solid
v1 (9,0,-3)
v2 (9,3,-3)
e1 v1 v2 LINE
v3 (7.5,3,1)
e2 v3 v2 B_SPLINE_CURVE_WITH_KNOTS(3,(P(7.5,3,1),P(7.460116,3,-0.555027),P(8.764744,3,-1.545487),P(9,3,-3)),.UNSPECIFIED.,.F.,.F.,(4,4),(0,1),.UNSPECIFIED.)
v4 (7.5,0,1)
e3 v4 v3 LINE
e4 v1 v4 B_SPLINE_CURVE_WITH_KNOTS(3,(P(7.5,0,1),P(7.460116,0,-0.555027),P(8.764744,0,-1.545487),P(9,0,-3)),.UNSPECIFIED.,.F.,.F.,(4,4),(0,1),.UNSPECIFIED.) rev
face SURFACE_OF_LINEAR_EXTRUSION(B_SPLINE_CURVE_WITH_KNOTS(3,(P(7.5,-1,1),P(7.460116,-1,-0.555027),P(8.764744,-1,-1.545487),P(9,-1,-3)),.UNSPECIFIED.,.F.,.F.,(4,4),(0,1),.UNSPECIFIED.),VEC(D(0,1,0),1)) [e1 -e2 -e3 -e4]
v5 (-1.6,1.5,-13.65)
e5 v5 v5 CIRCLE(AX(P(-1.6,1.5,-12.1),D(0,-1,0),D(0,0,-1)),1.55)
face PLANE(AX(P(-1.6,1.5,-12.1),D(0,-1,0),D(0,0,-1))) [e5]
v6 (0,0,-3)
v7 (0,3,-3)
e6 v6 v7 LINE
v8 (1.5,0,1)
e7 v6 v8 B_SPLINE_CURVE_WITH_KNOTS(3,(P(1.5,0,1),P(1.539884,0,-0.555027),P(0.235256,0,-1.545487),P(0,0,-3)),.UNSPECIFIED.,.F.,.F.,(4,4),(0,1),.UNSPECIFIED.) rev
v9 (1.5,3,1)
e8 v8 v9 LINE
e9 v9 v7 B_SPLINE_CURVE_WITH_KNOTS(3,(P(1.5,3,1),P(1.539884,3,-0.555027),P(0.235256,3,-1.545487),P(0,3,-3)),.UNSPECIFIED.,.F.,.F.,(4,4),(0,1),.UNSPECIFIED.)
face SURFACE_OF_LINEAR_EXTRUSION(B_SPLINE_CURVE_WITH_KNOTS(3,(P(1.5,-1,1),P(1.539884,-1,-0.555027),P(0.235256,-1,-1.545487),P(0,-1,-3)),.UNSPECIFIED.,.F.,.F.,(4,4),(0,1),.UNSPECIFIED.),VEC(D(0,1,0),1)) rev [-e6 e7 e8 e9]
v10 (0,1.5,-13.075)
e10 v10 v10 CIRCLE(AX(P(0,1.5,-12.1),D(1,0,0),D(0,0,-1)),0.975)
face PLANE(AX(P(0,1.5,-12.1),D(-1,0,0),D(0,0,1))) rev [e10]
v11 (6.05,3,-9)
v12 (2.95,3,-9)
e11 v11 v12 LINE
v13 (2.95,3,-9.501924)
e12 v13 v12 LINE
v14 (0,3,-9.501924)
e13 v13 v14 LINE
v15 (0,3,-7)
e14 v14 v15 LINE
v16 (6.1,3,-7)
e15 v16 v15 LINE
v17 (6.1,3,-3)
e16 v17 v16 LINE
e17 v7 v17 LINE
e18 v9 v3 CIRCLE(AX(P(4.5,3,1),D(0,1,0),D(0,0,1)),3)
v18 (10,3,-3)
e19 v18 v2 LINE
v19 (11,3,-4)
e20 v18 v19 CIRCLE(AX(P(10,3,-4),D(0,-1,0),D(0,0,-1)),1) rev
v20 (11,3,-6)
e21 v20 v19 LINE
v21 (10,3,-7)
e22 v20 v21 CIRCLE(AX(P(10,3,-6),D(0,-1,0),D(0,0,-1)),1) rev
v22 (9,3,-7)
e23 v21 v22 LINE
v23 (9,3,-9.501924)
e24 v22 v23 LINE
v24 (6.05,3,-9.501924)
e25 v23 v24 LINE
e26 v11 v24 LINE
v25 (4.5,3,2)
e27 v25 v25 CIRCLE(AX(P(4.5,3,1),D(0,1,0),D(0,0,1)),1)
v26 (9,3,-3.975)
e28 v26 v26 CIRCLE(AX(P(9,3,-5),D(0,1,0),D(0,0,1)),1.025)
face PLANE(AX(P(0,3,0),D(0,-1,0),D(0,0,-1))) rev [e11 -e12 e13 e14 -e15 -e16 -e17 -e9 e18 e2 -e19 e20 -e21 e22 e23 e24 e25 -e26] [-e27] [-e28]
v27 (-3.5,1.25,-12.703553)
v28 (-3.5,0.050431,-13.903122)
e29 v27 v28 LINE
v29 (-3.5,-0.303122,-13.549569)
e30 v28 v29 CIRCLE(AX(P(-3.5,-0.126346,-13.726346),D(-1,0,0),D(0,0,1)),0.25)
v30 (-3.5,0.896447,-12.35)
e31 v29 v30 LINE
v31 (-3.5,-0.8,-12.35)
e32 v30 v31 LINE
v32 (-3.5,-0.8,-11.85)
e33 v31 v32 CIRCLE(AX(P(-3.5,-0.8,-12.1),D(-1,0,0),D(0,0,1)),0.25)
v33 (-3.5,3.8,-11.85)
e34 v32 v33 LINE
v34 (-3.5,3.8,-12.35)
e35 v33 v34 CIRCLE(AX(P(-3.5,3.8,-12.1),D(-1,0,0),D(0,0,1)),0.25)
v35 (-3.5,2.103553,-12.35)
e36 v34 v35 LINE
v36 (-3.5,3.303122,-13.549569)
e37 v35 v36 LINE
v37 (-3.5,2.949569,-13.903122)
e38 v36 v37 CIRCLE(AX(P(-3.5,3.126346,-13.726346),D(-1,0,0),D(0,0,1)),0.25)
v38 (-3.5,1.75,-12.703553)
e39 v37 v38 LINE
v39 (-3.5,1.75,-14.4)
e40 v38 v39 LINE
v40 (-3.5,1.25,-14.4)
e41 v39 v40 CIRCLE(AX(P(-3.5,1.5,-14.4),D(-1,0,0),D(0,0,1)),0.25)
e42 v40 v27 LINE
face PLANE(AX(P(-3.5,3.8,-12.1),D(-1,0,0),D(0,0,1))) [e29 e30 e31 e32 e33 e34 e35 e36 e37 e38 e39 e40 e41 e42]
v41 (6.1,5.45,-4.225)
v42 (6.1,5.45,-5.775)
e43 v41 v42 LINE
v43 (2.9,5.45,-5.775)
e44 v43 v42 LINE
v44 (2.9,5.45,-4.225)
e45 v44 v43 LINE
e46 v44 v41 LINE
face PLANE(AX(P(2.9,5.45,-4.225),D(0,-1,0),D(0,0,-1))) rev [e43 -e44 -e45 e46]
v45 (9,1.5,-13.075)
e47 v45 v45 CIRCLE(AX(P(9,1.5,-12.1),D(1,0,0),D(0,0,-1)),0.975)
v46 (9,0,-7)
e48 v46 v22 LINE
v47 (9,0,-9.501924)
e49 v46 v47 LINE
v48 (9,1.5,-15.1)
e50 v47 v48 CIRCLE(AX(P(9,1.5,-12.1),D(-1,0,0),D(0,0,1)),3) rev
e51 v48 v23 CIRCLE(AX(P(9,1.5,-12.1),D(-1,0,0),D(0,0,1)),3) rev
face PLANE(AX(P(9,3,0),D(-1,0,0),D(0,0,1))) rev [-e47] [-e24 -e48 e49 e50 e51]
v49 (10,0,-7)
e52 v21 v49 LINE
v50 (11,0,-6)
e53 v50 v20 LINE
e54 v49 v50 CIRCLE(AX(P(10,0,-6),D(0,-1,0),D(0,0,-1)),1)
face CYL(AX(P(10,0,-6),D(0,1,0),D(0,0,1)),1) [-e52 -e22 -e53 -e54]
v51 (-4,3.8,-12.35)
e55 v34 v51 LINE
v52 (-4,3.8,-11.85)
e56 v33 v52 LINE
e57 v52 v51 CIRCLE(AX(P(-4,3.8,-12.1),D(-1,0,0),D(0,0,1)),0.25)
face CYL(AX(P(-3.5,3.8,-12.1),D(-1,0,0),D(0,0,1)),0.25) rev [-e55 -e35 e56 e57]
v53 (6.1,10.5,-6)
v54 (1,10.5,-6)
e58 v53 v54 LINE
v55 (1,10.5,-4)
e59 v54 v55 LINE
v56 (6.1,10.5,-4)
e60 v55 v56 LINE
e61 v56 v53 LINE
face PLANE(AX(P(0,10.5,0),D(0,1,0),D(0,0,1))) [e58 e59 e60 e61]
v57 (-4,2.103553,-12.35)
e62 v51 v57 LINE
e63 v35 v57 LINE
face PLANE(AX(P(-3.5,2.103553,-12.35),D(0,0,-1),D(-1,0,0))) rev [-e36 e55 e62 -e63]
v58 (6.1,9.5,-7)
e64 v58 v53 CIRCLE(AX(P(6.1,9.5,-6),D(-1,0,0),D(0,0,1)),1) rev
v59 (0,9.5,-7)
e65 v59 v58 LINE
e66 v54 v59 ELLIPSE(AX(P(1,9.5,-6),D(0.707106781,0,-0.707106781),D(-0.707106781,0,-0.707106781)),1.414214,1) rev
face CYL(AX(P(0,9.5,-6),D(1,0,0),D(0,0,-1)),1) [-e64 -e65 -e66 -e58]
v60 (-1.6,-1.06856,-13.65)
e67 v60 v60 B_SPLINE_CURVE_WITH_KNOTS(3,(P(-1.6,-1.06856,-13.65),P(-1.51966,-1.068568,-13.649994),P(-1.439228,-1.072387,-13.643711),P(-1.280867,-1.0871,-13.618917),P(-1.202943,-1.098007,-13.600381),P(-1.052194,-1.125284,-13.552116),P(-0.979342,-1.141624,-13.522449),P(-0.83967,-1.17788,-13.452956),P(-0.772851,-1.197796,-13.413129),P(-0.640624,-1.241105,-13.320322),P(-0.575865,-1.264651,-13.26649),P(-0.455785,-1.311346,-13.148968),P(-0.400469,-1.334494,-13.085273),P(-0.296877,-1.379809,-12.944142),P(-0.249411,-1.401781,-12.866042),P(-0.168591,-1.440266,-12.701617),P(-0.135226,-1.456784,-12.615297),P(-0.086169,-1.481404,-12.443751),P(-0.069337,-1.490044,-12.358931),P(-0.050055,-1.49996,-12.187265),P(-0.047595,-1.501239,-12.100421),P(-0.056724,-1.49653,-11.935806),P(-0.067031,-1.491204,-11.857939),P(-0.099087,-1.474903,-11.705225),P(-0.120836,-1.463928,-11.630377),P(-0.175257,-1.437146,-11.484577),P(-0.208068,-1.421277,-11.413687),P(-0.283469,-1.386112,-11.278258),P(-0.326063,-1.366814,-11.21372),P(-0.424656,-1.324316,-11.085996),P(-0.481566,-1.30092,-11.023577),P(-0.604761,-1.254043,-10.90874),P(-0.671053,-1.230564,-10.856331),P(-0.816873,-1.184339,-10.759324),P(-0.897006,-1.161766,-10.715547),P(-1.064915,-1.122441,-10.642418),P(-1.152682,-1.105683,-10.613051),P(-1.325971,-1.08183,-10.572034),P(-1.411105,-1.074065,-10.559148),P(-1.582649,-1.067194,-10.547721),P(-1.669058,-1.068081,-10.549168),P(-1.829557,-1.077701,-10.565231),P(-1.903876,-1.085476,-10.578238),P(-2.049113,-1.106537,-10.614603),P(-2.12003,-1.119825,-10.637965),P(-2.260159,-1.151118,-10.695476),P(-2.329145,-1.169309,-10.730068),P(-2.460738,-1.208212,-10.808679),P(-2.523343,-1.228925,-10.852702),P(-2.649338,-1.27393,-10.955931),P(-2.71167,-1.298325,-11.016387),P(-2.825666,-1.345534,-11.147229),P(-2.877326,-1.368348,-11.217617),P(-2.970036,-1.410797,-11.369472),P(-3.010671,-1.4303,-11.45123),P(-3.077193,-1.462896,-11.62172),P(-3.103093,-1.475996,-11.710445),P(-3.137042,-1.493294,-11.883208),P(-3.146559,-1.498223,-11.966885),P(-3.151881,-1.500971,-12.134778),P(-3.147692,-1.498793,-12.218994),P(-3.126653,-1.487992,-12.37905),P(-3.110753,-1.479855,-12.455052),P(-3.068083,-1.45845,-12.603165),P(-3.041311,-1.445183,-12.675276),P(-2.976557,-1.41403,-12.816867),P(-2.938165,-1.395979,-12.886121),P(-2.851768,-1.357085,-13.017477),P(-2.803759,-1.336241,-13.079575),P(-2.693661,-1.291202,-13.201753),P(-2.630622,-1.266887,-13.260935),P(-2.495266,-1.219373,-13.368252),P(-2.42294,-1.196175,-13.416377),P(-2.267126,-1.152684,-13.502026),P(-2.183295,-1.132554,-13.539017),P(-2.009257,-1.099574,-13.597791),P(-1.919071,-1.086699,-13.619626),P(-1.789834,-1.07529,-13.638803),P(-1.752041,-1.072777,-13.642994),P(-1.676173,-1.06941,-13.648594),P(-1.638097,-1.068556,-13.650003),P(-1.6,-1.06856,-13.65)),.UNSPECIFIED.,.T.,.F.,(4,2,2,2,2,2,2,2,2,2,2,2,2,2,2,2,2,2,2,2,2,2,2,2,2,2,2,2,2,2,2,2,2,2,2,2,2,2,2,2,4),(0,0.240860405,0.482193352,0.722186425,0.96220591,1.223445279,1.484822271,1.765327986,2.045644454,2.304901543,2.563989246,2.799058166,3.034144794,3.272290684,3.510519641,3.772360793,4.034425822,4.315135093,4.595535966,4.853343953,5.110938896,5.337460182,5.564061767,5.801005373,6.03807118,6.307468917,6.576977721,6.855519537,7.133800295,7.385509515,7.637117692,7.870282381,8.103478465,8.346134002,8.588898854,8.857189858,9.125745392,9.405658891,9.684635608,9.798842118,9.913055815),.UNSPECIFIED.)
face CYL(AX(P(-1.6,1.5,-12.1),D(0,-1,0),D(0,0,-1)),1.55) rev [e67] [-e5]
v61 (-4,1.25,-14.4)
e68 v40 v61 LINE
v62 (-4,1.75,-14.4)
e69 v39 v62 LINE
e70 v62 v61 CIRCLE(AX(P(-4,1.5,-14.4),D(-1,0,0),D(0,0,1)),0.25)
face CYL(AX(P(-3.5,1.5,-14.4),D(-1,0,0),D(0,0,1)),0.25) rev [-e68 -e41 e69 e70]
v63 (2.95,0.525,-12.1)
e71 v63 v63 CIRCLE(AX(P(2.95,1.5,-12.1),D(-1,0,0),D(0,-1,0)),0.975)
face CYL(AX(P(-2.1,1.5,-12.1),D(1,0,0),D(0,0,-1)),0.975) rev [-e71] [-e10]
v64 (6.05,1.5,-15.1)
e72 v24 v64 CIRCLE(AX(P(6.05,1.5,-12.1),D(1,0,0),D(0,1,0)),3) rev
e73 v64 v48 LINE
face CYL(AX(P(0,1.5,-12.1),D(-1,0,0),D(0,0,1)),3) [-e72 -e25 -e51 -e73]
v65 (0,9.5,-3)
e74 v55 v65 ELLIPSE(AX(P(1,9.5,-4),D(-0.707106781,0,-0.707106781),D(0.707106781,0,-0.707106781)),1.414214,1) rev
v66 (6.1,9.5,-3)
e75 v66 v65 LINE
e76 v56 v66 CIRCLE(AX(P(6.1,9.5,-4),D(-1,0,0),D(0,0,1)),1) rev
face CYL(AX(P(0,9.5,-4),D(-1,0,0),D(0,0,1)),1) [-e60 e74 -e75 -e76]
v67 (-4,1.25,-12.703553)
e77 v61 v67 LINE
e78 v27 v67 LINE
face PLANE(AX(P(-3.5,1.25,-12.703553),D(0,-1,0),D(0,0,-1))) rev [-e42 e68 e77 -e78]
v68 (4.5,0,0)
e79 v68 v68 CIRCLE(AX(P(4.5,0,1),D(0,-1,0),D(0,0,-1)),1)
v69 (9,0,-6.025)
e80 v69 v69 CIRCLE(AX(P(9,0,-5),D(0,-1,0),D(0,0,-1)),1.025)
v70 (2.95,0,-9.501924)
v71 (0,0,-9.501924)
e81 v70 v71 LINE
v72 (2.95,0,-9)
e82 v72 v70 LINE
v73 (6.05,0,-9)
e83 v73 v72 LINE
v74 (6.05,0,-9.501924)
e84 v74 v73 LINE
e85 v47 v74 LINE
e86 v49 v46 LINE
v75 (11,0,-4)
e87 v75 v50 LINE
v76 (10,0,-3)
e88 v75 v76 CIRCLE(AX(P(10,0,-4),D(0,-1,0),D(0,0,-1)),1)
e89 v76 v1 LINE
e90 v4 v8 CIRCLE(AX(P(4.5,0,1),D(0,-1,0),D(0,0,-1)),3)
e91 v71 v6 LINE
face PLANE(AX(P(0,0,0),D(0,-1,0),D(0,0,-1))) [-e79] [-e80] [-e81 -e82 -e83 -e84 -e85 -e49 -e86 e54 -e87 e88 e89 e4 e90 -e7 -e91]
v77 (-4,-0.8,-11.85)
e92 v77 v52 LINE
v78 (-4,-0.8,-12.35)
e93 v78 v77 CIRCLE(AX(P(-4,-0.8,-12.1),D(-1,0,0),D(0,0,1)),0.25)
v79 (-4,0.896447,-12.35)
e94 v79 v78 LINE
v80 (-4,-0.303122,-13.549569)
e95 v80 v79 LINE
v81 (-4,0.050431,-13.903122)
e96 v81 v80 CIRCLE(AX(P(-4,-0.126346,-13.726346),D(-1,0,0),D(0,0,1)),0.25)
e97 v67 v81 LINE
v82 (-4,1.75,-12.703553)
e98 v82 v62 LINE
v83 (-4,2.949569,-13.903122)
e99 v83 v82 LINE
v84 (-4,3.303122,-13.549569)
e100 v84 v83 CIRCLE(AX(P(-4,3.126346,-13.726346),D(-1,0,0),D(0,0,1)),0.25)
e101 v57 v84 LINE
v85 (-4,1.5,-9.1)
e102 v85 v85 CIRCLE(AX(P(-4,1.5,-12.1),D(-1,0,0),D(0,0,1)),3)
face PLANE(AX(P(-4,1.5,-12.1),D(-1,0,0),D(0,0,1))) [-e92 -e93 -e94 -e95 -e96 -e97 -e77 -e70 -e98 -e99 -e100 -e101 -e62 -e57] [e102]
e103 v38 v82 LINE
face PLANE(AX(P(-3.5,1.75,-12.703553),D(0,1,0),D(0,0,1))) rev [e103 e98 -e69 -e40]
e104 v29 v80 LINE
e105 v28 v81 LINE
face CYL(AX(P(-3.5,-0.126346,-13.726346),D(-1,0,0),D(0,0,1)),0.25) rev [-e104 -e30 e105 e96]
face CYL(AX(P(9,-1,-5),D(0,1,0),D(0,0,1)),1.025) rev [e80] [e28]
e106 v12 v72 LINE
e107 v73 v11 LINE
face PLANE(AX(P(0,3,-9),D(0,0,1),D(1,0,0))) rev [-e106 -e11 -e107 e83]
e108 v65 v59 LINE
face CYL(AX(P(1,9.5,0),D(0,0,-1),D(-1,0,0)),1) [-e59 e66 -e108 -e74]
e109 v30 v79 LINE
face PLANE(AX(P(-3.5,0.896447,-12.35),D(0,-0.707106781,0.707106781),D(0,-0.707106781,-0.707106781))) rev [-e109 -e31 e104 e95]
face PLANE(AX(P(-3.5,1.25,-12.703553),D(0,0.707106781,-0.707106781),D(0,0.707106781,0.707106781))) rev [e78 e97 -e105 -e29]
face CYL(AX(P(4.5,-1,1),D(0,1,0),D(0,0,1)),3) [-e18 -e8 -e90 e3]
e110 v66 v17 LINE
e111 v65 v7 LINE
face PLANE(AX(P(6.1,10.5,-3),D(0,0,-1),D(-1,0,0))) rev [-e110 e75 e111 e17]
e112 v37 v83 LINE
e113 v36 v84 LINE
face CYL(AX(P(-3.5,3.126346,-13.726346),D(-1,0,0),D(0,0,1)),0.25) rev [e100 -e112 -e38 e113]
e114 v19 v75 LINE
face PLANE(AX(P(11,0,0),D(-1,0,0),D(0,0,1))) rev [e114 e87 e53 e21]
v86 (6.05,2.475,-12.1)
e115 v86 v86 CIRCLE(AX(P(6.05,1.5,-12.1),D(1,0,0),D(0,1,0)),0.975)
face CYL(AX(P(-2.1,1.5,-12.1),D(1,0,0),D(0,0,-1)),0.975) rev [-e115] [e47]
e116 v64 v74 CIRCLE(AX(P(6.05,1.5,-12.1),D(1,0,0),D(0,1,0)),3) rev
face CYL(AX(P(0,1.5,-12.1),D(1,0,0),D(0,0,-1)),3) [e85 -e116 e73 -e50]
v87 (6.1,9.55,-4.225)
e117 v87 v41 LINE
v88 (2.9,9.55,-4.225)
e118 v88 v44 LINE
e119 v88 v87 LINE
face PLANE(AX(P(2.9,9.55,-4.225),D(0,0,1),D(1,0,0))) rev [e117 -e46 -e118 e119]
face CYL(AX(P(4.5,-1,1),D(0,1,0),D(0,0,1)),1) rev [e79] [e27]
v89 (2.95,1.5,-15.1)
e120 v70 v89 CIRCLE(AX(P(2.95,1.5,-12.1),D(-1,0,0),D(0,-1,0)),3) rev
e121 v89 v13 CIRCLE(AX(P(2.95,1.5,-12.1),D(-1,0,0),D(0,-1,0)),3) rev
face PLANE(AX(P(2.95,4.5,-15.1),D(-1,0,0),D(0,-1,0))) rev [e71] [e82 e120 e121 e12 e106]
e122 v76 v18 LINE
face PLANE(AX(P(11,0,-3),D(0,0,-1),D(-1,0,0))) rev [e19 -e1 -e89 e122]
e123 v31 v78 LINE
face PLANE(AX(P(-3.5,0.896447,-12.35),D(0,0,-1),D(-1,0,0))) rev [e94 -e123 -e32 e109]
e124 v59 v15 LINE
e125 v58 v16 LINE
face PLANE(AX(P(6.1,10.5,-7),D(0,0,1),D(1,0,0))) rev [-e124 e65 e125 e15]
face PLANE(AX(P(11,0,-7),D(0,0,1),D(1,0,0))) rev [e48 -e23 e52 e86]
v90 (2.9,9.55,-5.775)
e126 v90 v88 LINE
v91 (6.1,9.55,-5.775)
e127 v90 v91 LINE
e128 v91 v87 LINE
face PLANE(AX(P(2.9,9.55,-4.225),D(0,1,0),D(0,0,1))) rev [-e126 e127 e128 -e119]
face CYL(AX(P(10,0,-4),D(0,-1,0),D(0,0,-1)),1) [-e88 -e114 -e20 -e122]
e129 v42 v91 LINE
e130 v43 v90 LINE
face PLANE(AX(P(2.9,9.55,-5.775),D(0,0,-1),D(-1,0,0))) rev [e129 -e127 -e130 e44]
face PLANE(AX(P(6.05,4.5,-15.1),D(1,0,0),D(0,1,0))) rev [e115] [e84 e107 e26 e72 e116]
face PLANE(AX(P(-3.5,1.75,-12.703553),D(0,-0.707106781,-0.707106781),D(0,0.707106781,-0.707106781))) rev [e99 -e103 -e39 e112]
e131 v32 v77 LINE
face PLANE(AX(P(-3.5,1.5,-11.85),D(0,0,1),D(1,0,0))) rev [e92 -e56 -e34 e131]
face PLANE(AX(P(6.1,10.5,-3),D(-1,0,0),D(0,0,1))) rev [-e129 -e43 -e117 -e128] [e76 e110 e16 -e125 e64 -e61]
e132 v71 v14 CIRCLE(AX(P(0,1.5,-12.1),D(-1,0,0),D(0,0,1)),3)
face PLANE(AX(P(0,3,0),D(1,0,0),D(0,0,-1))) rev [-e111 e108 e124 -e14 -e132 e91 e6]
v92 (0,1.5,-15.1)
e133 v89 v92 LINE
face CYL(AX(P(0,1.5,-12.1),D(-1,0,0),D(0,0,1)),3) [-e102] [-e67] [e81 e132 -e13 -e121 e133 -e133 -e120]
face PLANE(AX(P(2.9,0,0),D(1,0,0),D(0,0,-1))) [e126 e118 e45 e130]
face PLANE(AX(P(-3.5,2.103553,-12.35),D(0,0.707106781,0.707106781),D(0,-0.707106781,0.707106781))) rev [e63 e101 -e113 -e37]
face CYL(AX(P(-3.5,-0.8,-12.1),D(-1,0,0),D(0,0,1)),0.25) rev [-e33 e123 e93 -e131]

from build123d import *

# Parameters (mm, degrees)
SKETCH1_W           = 9
SKETCH1_H           = 9
BOSS_EXTRUDE1_DEPTH = 3
SKETCH2_W           = 2.95
SKETCH2_H           = 6
BOSS_EXTRUDE2_DEPTH = 6.1
FILLET1_R           = 3
SKETCH3_R           = 0.975
CUT_EXTRUDE1_DEPTH  = 11.1
CUT_EXTRUDE3_DEPTH  = 21.1
BOSS_EXTRUDE3_START = 4
SKETCH5_R           = 3
BOSS_EXTRUDE3_DEPTH = 4
SKETCH8_R           = 1.55
CUT_EXTRUDE4_DEPTH  = 3
CUT_EXTRUDE5_DEPTH  = 0.5
SKETCH10_W          = 9
SKETCH10_H          = 3
BOSS_EXTRUDE4_DEPTH = 4
SKETCH11_R          = 1
CUT_EXTRUDE6_DEPTH  = 4
CUT_EXTRUDE7_DEPTH  = 4
SKETCH13_W          = 6.1
SKETCH13_H          = 4
BOSS_EXTRUDE7_DEPTH = 7.5
SKETCH16_W          = 1.55
SKETCH16_H          = 4.1
CUT_EXTRUDE9_DEPTH  = 3.2
SKETCH17_W          = 4
SKETCH17_H          = 3
BOSS_EXTRUDE8_DEPTH = 2
SKETCH19_R          = 1.025
CUT_EXTRUDE10_DEPTH = 4
FILLET2_R           = 1


with BuildPart() as part:
    # Sketch1 → Boss-Extrude1 (new body)
    with BuildSketch(Plane(origin=(0, 0, 0), x_dir=(1, 0, 0), z_dir=(0, 1, 0))):
        with Locations((4.5, 4.5)):
            Rectangle(SKETCH1_W, SKETCH1_H)
    extrude(amount=BOSS_EXTRUDE1_DEPTH)

    # Sketch2 → Boss-Extrude2 (add)
    with BuildSketch(Plane(origin=(0, 0, -9), x_dir=(-1, 0, 0), z_dir=(0, 0, -1))):
        with Locations((-7.525, 1.5)):
            Rectangle(SKETCH2_W, SKETCH2_H)
        with Locations((-1.475, 1.5)):
            Rectangle(SKETCH2_W, SKETCH2_H)
    extrude(amount=BOSS_EXTRUDE2_DEPTH)

    # Fillet1
    fillet1_edges = [part.edges().sort_by_distance(p)[0] for p in [
        (1.475, 4.5, -15.1),
        (1.475, -1.5, -15.1),
        (7.525, -1.5, -15.1),
        (7.525, 4.5, -15.1),
    ]]
    fillet(fillet1_edges, radius=FILLET1_R - 0.0001)  # a hair under: the kernel refuses the full size

    # Sketch3 → Cut-Extrude1 (cut)
    with BuildSketch(Plane(origin=(9, 0, 0), x_dir=(0, 0, -1), z_dir=(1, 0, 0))):
        with Locations((12.1, 1.5)):
            Circle(SKETCH3_R)
    extrude(amount=-CUT_EXTRUDE1_DEPTH, mode=Mode.SUBTRACT)

    # Sketch6 → Cut-Extrude3 (cut)
    with BuildSketch(Plane.ZY):
        with BuildLine():
            Line((-12.1, 4.5), (-9, 4.5))
            Line((-9, 4.5), (-9, 3))
            Line((-9, 3), (-9.501923789, 3))
            ThreePointArc((-9.501923789, 3), (-10.6, 4.098076211), (-12.1, 4.5))
        make_face()
        with BuildLine():
            Line((-12.1, -1.5), (-9, -1.5))
            Line((-9, -1.5), (-9, 0))
            Line((-9, 0), (-9.501923789, 0))
            ThreePointArc((-9.501923789, 0), (-10.6, -1.098076211), (-12.1, -1.5))
        make_face()
    extrude(amount=-CUT_EXTRUDE3_DEPTH, mode=Mode.SUBTRACT)

    # Sketch5 → Boss-Extrude3 (add)
    with BuildSketch(Plane.ZY.offset(BOSS_EXTRUDE3_START)):
        with Locations((-12.1, 1.5)):
            Circle(SKETCH5_R)
    extrude(amount=-BOSS_EXTRUDE3_DEPTH)

    # Sketch8 → Cut-Extrude4 (cut)
    with BuildSketch(Plane(origin=(0, -1.5, 0), x_dir=(-1, 0, 0), z_dir=(0, -1, 0))):
        with Locations(Location((1.6, 12.1, 0), (0, 0, 90))):
            Circle(SKETCH8_R)
    extrude(amount=-CUT_EXTRUDE4_DEPTH, mode=Mode.SUBTRACT)

    # Sketch9 → Cut-Extrude5 (cut)
    with BuildSketch(Plane.ZY.offset(4)):
        with BuildLine():
            Line((-11.85, 1.5), (-11.85, -0.8))
            ThreePointArc((-11.85, -0.8), (-12.1, -1.05), (-12.35, -0.8))
            Line((-12.35, -0.8), (-12.35, 0.896446609))
            Line((-12.35, 0.896446609), (-13.549568901, -0.303122292))
            ThreePointArc((-13.549568901, -0.303122292), (-13.903122292, -0.303122292), (-13.903122292, 0.050431099))
            Line((-13.903122292, 0.050431099), (-12.703553391, 1.25))
            Line((-12.703553391, 1.25), (-14.4, 1.25))
            ThreePointArc((-14.4, 1.25), (-14.65, 1.5), (-14.4, 1.75))
            Line((-14.4, 1.75), (-12.703553391, 1.75))
            Line((-12.703553391, 1.75), (-13.903122292, 2.949568901))
            ThreePointArc((-13.903122292, 2.949568901), (-13.903122292, 3.303122292), (-13.549568901, 3.303122292))
            Line((-13.549568901, 3.303122292), (-12.35, 2.103553391))
            Line((-12.35, 2.103553391), (-12.35, 3.8))
            ThreePointArc((-12.35, 3.8), (-12.1, 4.05), (-11.85, 3.8))
            Line((-11.85, 3.8), (-11.85, 1.5))
        make_face()
    extrude(amount=-CUT_EXTRUDE5_DEPTH, mode=Mode.SUBTRACT)

    # Sketch10 → Boss-Extrude4 (add)
    with BuildSketch(Plane.XY):
        with Locations((4.5, 1.5)):
            Rectangle(SKETCH10_W, SKETCH10_H)
    extrude(amount=BOSS_EXTRUDE4_DEPTH)

    # Sketch11 → Cut-Extrude6 (cut)
    with BuildSketch(Plane(origin=(0, 3, 0), x_dir=(1, 0, 0), z_dir=(0, 1, 0))):
        with Locations(Location((4.5, -1, 0), (0, 0, 270))):
            Circle(SKETCH11_R)
    extrude(amount=-CUT_EXTRUDE6_DEPTH, mode=Mode.SUBTRACT)

    # Sketch12 → Cut-Extrude7 (cut)
    with BuildSketch(Plane(origin=(0, 3, 0), x_dir=(1, 0, 0), z_dir=(0, 1, 0))):
        with BuildLine():
            add(Edge.make_bspline(
                [(1.5, -1), (1.53988428, 0.555027292), (0.235256098, 1.545486909), (0, 3)],
                knots=[0, 0, 0, 0, 1, 1, 1, 1], degree=3))
            Line((0, 3), (0, -4))
            Line((0, -4), (4.5, -4))
            ThreePointArc((4.5, -4), (2.378679656, -3.121320344), (1.5, -1))
        make_face()
        with BuildLine():
            ThreePointArc((7.5, -1), (6.621320344, -3.121320344), (4.5, -4))
            Line((4.5, -4), (9, -4))
            Line((9, -4), (9, 3))
            add(Edge.make_bspline(
                [(7.5, -1), (7.46011572, 0.555027292), (8.764743902, 1.545486909), (9, 3)],
                knots=[0, 0, 0, 0, 1, 1, 1, 1], degree=3))
        make_face()
    extrude(amount=-CUT_EXTRUDE7_DEPTH, mode=Mode.SUBTRACT)

    # Sketch13 → Boss-Extrude7 (add)
    with BuildSketch(Plane(origin=(0, 3, 0), x_dir=(1, 0, 0), z_dir=(0, 1, 0))):
        with Locations((3.05, 5)):
            Rectangle(SKETCH13_W, SKETCH13_H)
    extrude(amount=BOSS_EXTRUDE7_DEPTH)

    # Sketch16 → Cut-Extrude9 (cut)
    with BuildSketch(Plane(origin=(6.1, 0, 0), x_dir=(0, 0, -1), z_dir=(1, 0, 0))):
        with Locations((5, 7.5)):
            Rectangle(SKETCH16_W, SKETCH16_H)
    extrude(amount=-CUT_EXTRUDE9_DEPTH, mode=Mode.SUBTRACT)

    # Sketch17 → Boss-Extrude8 (add)
    with BuildSketch(Plane(origin=(9, 0, 0), x_dir=(0, 0, -1), z_dir=(1, 0, 0))):
        with Locations((5, 1.5)):
            Rectangle(SKETCH17_W, SKETCH17_H)
    extrude(amount=BOSS_EXTRUDE8_DEPTH)

    # Sketch19 → Cut-Extrude10 (cut)
    with BuildSketch(Plane(origin=(0, 3, 0), x_dir=(1, 0, 0), z_dir=(0, 1, 0))):
        with Locations(Location((9, 5, 0), (0, 0, 270))):
            Circle(SKETCH19_R)
    extrude(amount=-CUT_EXTRUDE10_DEPTH, mode=Mode.SUBTRACT)

    # Fillet2
    fillet2_edges = [part.edges().sort_by_distance(p)[0] for p in [
        (0, 10.5, -5),
        (3.05, 10.5, -3),
        (3.05, 10.5, -7),
        (11, 1.5, -3),
        (11, 1.5, -7),
    ]]
    fillet(fillet2_edges, radius=FILLET2_R)


solid = part.part
